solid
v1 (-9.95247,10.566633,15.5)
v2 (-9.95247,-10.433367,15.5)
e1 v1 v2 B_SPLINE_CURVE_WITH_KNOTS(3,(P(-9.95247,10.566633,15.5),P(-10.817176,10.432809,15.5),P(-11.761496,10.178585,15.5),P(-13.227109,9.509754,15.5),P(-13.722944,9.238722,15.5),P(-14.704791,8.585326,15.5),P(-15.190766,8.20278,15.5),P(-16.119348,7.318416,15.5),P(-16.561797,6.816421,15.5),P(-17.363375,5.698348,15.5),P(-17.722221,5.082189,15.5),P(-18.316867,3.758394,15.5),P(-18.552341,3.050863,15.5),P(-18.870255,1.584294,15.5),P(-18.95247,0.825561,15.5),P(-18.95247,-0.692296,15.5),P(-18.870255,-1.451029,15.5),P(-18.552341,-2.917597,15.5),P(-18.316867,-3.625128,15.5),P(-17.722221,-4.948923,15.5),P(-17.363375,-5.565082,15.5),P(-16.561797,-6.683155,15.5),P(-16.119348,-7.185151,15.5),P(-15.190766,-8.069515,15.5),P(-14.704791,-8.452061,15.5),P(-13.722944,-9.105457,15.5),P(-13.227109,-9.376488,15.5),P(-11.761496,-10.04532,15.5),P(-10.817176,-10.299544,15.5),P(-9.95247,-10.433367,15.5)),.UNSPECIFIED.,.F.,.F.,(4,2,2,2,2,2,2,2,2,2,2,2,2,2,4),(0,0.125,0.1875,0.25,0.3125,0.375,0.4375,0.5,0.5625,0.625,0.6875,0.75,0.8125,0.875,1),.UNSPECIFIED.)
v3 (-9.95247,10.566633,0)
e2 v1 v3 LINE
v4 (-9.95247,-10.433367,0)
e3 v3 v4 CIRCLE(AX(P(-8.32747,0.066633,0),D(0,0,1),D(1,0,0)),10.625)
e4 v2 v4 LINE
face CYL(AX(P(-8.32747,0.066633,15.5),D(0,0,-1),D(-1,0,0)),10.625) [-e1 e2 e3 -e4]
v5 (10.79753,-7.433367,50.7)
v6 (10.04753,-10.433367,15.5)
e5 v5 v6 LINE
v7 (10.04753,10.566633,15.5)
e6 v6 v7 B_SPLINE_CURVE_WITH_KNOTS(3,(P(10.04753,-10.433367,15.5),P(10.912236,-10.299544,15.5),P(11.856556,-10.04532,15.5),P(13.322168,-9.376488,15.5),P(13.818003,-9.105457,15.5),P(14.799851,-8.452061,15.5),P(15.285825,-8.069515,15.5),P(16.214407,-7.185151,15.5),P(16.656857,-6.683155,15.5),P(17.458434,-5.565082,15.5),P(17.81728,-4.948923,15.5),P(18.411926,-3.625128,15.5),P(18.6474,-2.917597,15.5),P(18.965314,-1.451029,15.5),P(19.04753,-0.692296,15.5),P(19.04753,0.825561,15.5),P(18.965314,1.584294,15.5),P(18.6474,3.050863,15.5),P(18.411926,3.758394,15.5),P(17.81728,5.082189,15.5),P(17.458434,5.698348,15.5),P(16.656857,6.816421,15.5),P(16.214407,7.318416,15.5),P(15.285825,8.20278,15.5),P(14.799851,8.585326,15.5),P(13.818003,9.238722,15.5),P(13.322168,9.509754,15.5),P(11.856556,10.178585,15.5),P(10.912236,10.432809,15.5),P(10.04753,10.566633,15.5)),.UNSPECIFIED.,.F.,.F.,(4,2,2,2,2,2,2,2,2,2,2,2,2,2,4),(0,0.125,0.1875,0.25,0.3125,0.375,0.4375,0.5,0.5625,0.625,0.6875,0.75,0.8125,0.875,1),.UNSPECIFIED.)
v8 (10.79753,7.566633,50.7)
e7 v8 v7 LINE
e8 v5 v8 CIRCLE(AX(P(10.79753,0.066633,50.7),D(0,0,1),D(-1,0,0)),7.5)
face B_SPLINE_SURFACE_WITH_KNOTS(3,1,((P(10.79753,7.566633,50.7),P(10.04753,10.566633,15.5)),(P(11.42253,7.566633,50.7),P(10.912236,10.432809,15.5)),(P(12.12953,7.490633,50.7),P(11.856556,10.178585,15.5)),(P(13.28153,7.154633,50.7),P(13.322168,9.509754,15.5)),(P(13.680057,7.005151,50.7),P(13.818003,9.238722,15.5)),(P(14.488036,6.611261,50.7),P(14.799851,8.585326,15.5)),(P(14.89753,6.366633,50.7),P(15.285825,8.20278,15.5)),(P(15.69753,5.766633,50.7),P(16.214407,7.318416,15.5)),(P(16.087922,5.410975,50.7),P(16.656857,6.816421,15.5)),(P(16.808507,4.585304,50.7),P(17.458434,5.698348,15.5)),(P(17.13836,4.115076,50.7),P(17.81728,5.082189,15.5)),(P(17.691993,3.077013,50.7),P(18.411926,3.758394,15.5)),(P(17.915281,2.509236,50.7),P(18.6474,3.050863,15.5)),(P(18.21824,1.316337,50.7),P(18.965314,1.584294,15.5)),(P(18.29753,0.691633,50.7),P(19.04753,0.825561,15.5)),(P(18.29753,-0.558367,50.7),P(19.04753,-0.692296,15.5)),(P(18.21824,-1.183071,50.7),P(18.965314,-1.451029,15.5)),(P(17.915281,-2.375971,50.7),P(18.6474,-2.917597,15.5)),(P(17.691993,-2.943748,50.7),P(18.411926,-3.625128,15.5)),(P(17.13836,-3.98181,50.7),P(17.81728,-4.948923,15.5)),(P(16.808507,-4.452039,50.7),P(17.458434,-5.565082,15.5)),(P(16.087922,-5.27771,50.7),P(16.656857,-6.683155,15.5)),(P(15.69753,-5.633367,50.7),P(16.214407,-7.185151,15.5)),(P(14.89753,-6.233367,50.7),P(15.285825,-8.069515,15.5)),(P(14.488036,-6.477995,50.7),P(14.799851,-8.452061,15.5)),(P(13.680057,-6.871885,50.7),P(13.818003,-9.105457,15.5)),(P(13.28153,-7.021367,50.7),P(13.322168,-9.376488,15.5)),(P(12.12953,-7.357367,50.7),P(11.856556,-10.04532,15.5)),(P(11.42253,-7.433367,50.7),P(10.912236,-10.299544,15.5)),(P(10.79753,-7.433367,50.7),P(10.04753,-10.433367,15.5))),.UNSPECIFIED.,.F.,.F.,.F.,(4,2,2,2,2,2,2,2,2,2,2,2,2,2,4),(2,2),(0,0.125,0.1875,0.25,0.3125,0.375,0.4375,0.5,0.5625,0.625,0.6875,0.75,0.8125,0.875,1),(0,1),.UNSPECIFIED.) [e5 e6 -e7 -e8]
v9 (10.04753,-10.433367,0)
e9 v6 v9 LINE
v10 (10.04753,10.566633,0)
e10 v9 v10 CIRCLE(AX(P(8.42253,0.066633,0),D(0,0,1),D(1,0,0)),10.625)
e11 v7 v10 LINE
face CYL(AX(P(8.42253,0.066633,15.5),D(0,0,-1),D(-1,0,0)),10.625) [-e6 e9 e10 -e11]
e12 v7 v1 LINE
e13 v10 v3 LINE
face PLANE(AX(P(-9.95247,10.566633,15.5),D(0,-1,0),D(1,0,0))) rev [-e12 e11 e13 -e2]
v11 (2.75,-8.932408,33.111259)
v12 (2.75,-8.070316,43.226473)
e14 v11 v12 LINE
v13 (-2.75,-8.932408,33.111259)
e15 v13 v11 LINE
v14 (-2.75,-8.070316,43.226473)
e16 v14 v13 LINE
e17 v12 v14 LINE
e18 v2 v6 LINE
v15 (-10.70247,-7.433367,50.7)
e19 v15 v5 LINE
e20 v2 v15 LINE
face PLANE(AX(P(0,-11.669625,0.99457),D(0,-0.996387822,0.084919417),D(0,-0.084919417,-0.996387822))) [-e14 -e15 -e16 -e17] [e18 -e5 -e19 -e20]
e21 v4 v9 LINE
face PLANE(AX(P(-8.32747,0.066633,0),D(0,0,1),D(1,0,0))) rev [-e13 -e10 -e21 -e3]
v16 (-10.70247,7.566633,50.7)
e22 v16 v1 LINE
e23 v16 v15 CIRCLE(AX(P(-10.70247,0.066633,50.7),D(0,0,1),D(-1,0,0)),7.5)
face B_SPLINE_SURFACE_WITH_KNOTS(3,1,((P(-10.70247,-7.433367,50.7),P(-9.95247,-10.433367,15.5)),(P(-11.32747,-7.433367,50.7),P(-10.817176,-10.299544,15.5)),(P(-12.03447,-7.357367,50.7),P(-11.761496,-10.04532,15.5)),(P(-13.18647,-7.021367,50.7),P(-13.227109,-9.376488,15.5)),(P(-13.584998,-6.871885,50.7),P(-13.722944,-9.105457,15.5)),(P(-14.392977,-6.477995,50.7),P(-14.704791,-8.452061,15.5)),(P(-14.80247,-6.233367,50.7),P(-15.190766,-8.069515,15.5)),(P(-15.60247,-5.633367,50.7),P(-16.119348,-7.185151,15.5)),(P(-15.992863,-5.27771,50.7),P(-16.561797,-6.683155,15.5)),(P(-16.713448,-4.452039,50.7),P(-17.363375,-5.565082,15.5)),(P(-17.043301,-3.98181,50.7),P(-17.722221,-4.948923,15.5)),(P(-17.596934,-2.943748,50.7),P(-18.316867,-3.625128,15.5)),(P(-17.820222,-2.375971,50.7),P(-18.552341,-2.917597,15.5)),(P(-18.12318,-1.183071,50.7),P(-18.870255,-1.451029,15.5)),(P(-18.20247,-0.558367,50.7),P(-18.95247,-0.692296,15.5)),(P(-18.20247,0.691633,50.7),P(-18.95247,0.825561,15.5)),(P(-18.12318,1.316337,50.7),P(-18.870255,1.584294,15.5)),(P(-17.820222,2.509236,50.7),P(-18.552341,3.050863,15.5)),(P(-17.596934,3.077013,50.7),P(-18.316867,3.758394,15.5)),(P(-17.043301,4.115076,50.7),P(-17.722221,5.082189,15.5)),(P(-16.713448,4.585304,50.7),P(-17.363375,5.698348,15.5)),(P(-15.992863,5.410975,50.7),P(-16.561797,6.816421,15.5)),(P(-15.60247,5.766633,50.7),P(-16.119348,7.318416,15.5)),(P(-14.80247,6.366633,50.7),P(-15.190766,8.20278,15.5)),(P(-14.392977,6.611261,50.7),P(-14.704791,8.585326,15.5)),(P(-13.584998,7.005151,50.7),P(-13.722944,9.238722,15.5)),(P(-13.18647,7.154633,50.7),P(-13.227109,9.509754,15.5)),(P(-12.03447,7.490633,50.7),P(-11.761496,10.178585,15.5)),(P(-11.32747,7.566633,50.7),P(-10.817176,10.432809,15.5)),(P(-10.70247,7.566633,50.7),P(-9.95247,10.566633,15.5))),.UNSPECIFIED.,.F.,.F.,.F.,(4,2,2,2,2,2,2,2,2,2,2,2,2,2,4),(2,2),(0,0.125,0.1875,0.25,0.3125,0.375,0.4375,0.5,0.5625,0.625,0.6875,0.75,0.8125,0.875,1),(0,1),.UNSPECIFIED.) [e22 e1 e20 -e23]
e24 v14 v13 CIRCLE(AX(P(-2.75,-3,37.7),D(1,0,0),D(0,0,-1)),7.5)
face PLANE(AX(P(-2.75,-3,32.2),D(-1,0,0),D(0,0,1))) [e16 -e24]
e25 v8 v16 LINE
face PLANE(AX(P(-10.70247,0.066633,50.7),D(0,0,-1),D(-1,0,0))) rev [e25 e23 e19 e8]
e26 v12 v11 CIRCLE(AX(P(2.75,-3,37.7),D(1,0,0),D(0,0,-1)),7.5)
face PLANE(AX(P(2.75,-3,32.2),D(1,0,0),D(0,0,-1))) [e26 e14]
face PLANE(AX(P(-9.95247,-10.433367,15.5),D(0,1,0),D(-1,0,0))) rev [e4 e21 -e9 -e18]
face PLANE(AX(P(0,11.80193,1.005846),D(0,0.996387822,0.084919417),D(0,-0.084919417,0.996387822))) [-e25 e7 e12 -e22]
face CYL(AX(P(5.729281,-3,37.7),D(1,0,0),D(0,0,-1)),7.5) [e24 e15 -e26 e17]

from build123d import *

# Parameters (mm, degrees)
EXTRUDE_1_DEPTH = 15.5
SKETCH_3_W      = 5.5
SKETCH_3_H      = 2


with BuildPart() as part:
    # ｽｹｯﾁ1 → ﾎﾞｽ - 押し出し1 (new body)
    with BuildSketch(Plane.XY):
        with BuildLine():
            Line((-9.95247038, -10.433367245), (10.04752962, -10.433367245))
            ThreePointArc((10.04752962, -10.433367245), (19.04752962, 0.066632755), (10.04752962, 10.566632755))
            Line((10.04752962, 10.566632755), (-9.95247038, 10.566632755))
            ThreePointArc((-9.95247038, 10.566632755), (-18.95247038, 0.066632755), (-9.95247038, -10.433367245))
        make_face()
    extrude(amount=EXTRUDE_1_DEPTH)

    # ﾛﾌﾄ1: read off the stored shape, not the designer's step
    # ﾛﾌﾄ1: loft between two sections, ruled curve by curve
    loft_1_from = [
        Edge.make_bspline([(-10.70247038, -7.433367245, 50.7), (-11.32747038, -7.433367245, 50.7), (-12.03447038, -7.357367245, 50.7), (-13.18647038, -7.021367245, 50.7), (-13.584997838, -6.871885109, 50.7), (-14.392976629, -6.477995449, 50.7), (-14.80247038, -6.233367245, 50.7), (-15.60247038, -5.633367245, 50.7), (-15.992862573, -5.277709523, 50.7), (-16.713448049, -4.452038666, 50.7), (-17.04330083, -3.981810152, 50.7), (-17.596934048, -2.943747868, 50.7), (-17.820221859, -2.375970796, 50.7), (-18.123180439, -1.183071387, 50.7), (-18.20247038, -0.558367245, 50.7), (-18.20247038, 0.691632755, 50.7), (-18.123180439, 1.316336897, 50.7), (-17.820221859, 2.509236305, 50.7), (-17.596934048, 3.077013378, 50.7), (-17.04330083, 4.115075661, 50.7), (-16.713448049, 4.585304175, 50.7), (-15.992862573, 5.410975033, 50.7), (-15.60247038, 5.766632755, 50.7), (-14.80247038, 6.366632755, 50.7), (-14.392976629, 6.611260958, 50.7), (-13.584997838, 7.005150619, 50.7), (-13.18647038, 7.154632755, 50.7), (-12.03447038, 7.490632755, 50.7), (-11.32747038, 7.566632755, 50.7), (-10.70247038, 7.566632755, 50.7)], [0, 0, 0, 0, 0.125, 0.125, 0.1875, 0.1875, 0.25, 0.25, 0.3125, 0.3125, 0.375, 0.375, 0.4375, 0.4375, 0.5, 0.5, 0.5625, 0.5625, 0.625, 0.625, 0.6875, 0.6875, 0.75, 0.75, 0.8125, 0.8125, 0.875, 0.875, 1, 1, 1, 1], 3),
        Edge.make_bspline([(10.79752962, 7.566632755, 50.7), (11.42252962, 7.566632755, 50.7), (12.12952962, 7.490632755, 50.7), (13.28152962, 7.154632755, 50.7), (13.680057079, 7.005150619, 50.7), (14.488035869, 6.611260958, 50.7), (14.89752962, 6.366632755, 50.7), (15.69752962, 5.766632755, 50.7), (16.087921814, 5.410975033, 50.7), (16.80850729, 4.585304175, 50.7), (17.13836007, 4.115075661, 50.7), (17.691993288, 3.077013378, 50.7), (17.9152811, 2.509236305, 50.7), (18.218239679, 1.316336897, 50.7), (18.29752962, 0.691632755, 50.7), (18.29752962, -0.558367245, 50.7), (18.218239679, -1.183071387, 50.7), (17.9152811, -2.375970796, 50.7), (17.691993288, -2.943747868, 50.7), (17.13836007, -3.981810152, 50.7), (16.80850729, -4.452038666, 50.7), (16.087921814, -5.277709523, 50.7), (15.69752962, -5.633367245, 50.7), (14.89752962, -6.233367245, 50.7), (14.488035869, -6.477995449, 50.7), (13.680057079, -6.871885109, 50.7), (13.28152962, -7.021367245, 50.7), (12.12952962, -7.357367245, 50.7), (11.42252962, -7.433367245, 50.7), (10.79752962, -7.433367245, 50.7)], [0, 0, 0, 0, 0.125, 0.125, 0.1875, 0.1875, 0.25, 0.25, 0.3125, 0.3125, 0.375, 0.375, 0.4375, 0.4375, 0.5, 0.5, 0.5625, 0.5625, 0.625, 0.625, 0.6875, 0.6875, 0.75, 0.75, 0.8125, 0.8125, 0.875, 0.875, 1, 1, 1, 1], 3),
        Edge.make_line((10.79752962, 7.566632755, 50.7), (-10.70247038, 7.566632755, 50.7)),
        Edge.make_line((-10.70247038, -7.433367245, 50.7), (10.79752962, -7.433367245, 50.7)),
    ]
    loft_1_to = [
        Edge.make_bspline([(-9.95247038, -10.433367245, 15.5), (-10.817176262, -10.299543716, 15.5), (-11.761496302, -10.045319701, 15.5), (-13.227109043, -9.37648849, 15.5), (-13.722944193, -9.105456696, 15.5), (-14.704791413, -8.452060748, 15.5), (-15.190765564, -8.069514689, 15.5), (-16.119347609, -7.185150836, 15.5), (-16.561797454, -6.683155076, 15.5), (-17.36337452, -5.565082304, 15.5), (-17.722220528, -4.948923462, 15.5), (-18.316866572, -3.625128102, 15.5), (-18.552340539, -2.917597164, 15.5), (-18.870254697, -1.451028878, 15.5), (-18.95247038, -0.692295817, 15.5), (-18.95247038, 0.825561326, 15.5), (-18.870254697, 1.584294387, 15.5), (-18.552340539, 3.050862673, 15.5), (-18.316866572, 3.758393611, 15.5), (-17.722220528, 5.082188971, 15.5), (-17.36337452, 5.698347814, 15.5), (-16.561797454, 6.816420586, 15.5), (-16.119347609, 7.318416346, 15.5), (-15.190765564, 8.202780198, 15.5), (-14.704791413, 8.585326258, 15.5), (-13.722944193, 9.238722205, 15.5), (-13.227109043, 9.509754, 15.5), (-11.761496302, 10.178585211, 15.5), (-10.817176262, 10.432809225, 15.5), (-9.95247038, 10.566632755, 15.5)], [0, 0, 0, 0, 0.125, 0.125, 0.1875, 0.1875, 0.25, 0.25, 0.3125, 0.3125, 0.375, 0.375, 0.4375, 0.4375, 0.5, 0.5, 0.5625, 0.5625, 0.625, 0.625, 0.6875, 0.6875, 0.75, 0.75, 0.8125, 0.8125, 0.875, 0.875, 1, 1, 1, 1], 3),
        Edge.make_bspline([(10.04752962, 10.566632755, 15.5), (10.912235503, 10.432809225, 15.5), (11.856555543, 10.178585211, 15.5), (13.322168284, 9.509754, 15.5), (13.818003433, 9.238722205, 15.5), (14.799850654, 8.585326258, 15.5), (15.285824805, 8.202780198, 15.5), (16.21440685, 7.318416346, 15.5), (16.656856694, 6.816420586, 15.5), (17.45843376, 5.698347814, 15.5), (17.817279769, 5.082188971, 15.5), (18.411925813, 3.758393611, 15.5), (18.64739978, 3.050862673, 15.5), (18.965313937, 1.584294387, 15.5), (19.04752962, 0.825561326, 15.5), (19.04752962, -0.692295817, 15.5), (18.965313937, -1.451028878, 15.5), (18.64739978, -2.917597164, 15.5), (18.411925813, -3.625128102, 15.5), (17.817279769, -4.948923462, 15.5), (17.45843376, -5.565082304, 15.5), (16.656856694, -6.683155076, 15.5), (16.21440685, -7.185150836, 15.5), (15.285824805, -8.069514689, 15.5), (14.799850654, -8.452060748, 15.5), (13.818003433, -9.105456696, 15.5), (13.322168284, -9.37648849, 15.5), (11.856555543, -10.045319701, 15.5), (10.912235503, -10.299543716, 15.5), (10.04752962, -10.433367245, 15.5)], [0, 0, 0, 0, 0.125, 0.125, 0.1875, 0.1875, 0.25, 0.25, 0.3125, 0.3125, 0.375, 0.375, 0.4375, 0.4375, 0.5, 0.5, 0.5625, 0.5625, 0.625, 0.625, 0.6875, 0.6875, 0.75, 0.75, 0.8125, 0.8125, 0.875, 0.875, 1, 1, 1, 1], 3),
        Edge.make_line((10.04752962, 10.566632755, 15.5), (-9.95247038, 10.566632755, 15.5)),
        Edge.make_line((-9.95247038, -10.433367245, 15.5), (10.04752962, -10.433367245, 15.5)),
    ]
    loft_1 = Solid(Shell([*[Face.make_surface_from_curves(loft_1_from[k], loft_1_to[k]) for k in range(4)], Face(Wire(loft_1_from)), Face(Wire(loft_1_to))]))
    add(loft_1)

    # ｽｹｯﾁ3 → 回転1 (revolve)
    with BuildSketch(Plane(origin=(0, -3, 0), x_dir=(1, 0, 0), z_dir=(0, 1, 0))):
        with Locations((0, -31.2)):
            Rectangle(SKETCH_3_W, SKETCH_3_H)
    revolve(axis=Axis((5.729281216, -3, 37.7), (-1, 0, 0)))


solid = part.part
